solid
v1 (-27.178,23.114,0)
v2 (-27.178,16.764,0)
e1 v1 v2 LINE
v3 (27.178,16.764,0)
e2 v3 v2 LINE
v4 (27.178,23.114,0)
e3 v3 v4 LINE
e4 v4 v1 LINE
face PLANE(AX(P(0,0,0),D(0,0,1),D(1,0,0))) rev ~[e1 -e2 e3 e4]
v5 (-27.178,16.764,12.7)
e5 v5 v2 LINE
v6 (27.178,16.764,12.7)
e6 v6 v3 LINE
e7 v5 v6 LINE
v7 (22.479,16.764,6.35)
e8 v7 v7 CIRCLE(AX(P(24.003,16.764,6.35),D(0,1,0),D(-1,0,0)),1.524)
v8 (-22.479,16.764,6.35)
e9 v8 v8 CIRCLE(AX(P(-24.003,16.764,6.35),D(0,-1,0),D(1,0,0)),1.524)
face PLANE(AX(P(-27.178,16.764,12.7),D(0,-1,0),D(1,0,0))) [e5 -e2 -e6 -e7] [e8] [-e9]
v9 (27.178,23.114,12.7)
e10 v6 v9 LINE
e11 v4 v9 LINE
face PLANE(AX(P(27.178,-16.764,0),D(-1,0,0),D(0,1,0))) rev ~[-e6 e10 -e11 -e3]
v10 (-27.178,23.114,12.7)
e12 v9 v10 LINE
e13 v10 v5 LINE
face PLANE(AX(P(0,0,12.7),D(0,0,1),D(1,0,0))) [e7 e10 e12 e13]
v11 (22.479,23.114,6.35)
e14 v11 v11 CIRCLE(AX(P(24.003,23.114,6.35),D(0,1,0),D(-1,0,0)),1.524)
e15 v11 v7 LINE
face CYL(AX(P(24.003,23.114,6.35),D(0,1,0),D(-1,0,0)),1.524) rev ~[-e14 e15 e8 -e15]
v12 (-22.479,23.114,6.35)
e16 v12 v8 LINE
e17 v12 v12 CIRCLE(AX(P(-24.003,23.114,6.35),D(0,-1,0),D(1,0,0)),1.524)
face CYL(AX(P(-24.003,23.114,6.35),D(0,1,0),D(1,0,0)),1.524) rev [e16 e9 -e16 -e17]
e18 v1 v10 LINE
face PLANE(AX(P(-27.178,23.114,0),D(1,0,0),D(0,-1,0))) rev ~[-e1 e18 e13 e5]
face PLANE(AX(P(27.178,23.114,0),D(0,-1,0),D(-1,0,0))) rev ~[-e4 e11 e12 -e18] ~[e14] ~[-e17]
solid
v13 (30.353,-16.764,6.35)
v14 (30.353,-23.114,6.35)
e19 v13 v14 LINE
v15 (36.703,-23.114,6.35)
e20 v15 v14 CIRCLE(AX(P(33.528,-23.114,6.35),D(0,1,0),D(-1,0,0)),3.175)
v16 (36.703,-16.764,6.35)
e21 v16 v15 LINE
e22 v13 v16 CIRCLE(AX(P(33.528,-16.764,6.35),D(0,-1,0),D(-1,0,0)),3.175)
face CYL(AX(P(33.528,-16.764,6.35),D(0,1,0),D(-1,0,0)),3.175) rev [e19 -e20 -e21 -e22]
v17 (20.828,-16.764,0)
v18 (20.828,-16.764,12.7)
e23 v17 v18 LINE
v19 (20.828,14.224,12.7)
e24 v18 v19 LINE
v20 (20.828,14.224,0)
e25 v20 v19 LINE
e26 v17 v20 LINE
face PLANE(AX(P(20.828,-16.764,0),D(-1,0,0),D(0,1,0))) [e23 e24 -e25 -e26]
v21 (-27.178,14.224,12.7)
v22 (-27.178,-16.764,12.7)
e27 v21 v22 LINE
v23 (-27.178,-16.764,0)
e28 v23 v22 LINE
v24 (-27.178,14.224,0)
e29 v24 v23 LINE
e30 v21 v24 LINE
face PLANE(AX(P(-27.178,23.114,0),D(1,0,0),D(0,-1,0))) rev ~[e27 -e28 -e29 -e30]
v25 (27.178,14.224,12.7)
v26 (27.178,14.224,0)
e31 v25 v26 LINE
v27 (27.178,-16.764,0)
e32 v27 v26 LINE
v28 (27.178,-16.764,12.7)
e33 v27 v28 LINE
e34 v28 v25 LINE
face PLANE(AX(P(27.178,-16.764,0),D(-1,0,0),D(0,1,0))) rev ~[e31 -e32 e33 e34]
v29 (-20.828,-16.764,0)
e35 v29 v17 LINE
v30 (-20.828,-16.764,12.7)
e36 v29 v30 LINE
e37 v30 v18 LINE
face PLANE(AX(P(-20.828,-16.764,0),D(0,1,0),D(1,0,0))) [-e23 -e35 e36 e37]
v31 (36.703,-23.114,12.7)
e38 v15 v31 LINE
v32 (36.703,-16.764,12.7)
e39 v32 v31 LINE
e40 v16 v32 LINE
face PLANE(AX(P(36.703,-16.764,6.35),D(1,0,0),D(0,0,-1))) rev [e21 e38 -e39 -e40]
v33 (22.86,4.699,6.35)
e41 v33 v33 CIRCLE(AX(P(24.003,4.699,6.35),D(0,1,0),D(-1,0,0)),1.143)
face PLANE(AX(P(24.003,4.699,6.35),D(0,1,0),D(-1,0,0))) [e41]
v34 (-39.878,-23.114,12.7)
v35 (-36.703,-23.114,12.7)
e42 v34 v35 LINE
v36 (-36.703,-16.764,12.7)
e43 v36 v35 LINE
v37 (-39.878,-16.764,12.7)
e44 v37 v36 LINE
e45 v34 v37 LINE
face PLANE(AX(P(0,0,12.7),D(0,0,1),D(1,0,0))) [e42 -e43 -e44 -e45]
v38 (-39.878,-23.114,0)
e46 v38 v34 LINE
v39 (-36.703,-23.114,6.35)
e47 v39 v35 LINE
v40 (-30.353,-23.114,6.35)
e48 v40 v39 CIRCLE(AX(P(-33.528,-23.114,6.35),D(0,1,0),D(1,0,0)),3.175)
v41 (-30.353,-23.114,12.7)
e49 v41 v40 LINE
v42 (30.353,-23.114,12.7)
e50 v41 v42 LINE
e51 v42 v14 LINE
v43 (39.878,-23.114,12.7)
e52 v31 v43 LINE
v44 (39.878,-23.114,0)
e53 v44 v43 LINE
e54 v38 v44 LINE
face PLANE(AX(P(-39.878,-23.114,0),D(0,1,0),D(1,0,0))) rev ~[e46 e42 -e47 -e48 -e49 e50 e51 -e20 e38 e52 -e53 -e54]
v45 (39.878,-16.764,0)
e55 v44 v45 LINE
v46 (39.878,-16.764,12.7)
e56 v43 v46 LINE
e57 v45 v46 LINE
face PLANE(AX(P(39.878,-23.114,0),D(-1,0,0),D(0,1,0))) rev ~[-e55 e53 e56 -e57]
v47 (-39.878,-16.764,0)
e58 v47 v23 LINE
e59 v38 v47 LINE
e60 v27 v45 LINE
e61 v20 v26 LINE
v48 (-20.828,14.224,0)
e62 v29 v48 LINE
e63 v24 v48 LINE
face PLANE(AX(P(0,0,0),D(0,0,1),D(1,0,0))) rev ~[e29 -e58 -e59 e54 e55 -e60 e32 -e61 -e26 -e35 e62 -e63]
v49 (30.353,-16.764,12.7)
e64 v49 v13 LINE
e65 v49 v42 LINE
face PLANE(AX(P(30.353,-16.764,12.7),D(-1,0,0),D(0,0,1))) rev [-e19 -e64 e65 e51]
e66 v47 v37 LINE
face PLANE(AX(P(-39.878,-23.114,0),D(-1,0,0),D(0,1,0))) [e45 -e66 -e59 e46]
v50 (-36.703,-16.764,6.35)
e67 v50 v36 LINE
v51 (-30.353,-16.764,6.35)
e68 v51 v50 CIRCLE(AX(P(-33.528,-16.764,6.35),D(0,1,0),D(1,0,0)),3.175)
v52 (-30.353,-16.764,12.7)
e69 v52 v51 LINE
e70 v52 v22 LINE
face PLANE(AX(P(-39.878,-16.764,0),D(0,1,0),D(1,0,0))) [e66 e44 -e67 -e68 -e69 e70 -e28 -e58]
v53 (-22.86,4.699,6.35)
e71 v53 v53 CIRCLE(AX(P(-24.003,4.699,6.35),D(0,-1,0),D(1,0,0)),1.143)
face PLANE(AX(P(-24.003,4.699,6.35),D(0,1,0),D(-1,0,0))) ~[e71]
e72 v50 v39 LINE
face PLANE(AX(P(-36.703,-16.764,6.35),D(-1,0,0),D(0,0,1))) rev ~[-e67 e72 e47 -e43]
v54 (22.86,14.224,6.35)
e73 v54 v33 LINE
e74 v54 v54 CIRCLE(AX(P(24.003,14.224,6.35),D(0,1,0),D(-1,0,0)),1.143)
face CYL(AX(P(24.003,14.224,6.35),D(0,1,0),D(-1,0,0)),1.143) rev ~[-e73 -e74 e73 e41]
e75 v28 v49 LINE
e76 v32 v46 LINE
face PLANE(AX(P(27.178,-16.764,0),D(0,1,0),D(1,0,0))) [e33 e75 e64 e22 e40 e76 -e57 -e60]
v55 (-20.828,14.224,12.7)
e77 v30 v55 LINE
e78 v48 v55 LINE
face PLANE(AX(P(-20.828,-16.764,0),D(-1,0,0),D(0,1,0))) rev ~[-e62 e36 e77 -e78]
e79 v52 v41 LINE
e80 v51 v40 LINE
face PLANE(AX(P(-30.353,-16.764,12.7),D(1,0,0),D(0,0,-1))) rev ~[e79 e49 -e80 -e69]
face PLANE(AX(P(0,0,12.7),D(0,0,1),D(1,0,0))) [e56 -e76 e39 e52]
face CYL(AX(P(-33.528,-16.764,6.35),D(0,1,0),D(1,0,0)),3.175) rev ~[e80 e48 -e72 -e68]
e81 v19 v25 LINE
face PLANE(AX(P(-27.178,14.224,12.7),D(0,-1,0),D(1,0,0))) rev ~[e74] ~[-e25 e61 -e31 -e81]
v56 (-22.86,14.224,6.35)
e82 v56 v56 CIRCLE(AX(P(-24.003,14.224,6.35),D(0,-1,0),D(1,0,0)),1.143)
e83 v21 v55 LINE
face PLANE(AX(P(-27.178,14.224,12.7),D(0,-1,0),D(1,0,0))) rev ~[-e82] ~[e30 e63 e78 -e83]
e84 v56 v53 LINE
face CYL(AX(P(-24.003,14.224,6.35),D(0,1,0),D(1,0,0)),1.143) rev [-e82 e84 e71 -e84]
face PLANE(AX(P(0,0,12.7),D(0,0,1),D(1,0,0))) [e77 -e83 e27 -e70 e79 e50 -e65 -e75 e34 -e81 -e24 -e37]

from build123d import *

# Parameters (mm, degrees)
F0_W     = 41.656
F0_H     = 33.528
F0_W_2   = 12.7
F0_H_2   = 6.35
F1_DEPTH = 12.7
F3_DEPTH = 6.351
F4_W     = 54.356
F4_H     = 2.54
F5_DEPTH = 12.701
F6_R     = 1.143
F7_DEPTH = 9.525
F8_R     = 1.524
F9_DEPTH = 6.35


# Not quite as in the source:
# - a pattern or mirror of a feature is missing from the dataset's text; its kind, count and spacing are read off the source's solid


with BuildPart() as f1:
    # F0 (on Top) → F1 (new body)
    with BuildSketch(Plane.XY):
        Polygon((27.178, -16.764), (27.178, 23.114), (-27.178, 23.114), (-27.178, -16.764), (-27.178, -23.114), (27.178, -23.114), align=None)
        Rectangle(F0_W, F0_H, mode=Mode.SUBTRACT)
        with Locations((33.528, -19.939)):
            Rectangle(F0_W_2, F0_H_2)
        with Locations((-33.528, -19.939)):
            Rectangle(F0_W_2, F0_H_2)
    extrude(amount=F1_DEPTH)

    # F2 (on face) → F3 (cut, through all)
    with BuildSketch(Plane(origin=(0, -16.764, 0), x_dir=(-1, 0, 0), z_dir=(0, 1, 0))):
        with BuildLine():
            Line((30.353, 12.7), (30.353, 6.35))
            ThreePointArc((30.353, 6.35), (33.528, 3.175), (36.703, 6.35))
            Line((36.703, 6.35), (36.703, 12.7))
            Line((36.703, 12.7), (30.353, 12.7))
        make_face()
    f3 = extrude(amount=-F3_DEPTH, mode=Mode.SUBTRACT)

    # F3_copies: F3 across plane
    add(f3.mirror(Plane(origin=(0, 0, 0), x_dir=(0, 0, 1), z_dir=(1, 0, 0))), mode=Mode.SUBTRACT)

    # F4 (on face) → F5 (cut, through all)
    with BuildSketch(Plane.XY.offset(12.7)):
        with Locations((0, 15.494)):
            Rectangle(F4_W, F4_H)
    extrude(amount=-F5_DEPTH, mode=Mode.SUBTRACT)

    # F6 (on face) → F7 (cut)
    with BuildSketch(Plane(origin=(0, 14.224, 0), x_dir=(-1, 0, 0), z_dir=(0, 1, 0))):
        with Locations((-24.003, 6.35)):
            Circle(F6_R)
    f7 = extrude(amount=-F7_DEPTH, mode=Mode.SUBTRACT)

    # F7_copies: F7 across plane
    add(f7.mirror(Plane(origin=(0, 0, 0), x_dir=(0, 0, -1), z_dir=(-1, 0, 0))), mode=Mode.SUBTRACT)

    # F8 (on face) → F9 (cut, through all)
    with BuildSketch(Plane(origin=(0, 23.114, 0), x_dir=(-1, 0, 0), z_dir=(0, 1, 0))):
        with Locations((-24.003, 6.35)):
            Circle(F8_R)
    f9 = extrude(amount=-F9_DEPTH, mode=Mode.SUBTRACT)

    # F9_copies: F9 across plane
    add(f9.mirror(Plane(origin=(0, 0, 0), x_dir=(0, 0, -1), z_dir=(-1, 0, 0))), mode=Mode.SUBTRACT)


solid = f1.part
